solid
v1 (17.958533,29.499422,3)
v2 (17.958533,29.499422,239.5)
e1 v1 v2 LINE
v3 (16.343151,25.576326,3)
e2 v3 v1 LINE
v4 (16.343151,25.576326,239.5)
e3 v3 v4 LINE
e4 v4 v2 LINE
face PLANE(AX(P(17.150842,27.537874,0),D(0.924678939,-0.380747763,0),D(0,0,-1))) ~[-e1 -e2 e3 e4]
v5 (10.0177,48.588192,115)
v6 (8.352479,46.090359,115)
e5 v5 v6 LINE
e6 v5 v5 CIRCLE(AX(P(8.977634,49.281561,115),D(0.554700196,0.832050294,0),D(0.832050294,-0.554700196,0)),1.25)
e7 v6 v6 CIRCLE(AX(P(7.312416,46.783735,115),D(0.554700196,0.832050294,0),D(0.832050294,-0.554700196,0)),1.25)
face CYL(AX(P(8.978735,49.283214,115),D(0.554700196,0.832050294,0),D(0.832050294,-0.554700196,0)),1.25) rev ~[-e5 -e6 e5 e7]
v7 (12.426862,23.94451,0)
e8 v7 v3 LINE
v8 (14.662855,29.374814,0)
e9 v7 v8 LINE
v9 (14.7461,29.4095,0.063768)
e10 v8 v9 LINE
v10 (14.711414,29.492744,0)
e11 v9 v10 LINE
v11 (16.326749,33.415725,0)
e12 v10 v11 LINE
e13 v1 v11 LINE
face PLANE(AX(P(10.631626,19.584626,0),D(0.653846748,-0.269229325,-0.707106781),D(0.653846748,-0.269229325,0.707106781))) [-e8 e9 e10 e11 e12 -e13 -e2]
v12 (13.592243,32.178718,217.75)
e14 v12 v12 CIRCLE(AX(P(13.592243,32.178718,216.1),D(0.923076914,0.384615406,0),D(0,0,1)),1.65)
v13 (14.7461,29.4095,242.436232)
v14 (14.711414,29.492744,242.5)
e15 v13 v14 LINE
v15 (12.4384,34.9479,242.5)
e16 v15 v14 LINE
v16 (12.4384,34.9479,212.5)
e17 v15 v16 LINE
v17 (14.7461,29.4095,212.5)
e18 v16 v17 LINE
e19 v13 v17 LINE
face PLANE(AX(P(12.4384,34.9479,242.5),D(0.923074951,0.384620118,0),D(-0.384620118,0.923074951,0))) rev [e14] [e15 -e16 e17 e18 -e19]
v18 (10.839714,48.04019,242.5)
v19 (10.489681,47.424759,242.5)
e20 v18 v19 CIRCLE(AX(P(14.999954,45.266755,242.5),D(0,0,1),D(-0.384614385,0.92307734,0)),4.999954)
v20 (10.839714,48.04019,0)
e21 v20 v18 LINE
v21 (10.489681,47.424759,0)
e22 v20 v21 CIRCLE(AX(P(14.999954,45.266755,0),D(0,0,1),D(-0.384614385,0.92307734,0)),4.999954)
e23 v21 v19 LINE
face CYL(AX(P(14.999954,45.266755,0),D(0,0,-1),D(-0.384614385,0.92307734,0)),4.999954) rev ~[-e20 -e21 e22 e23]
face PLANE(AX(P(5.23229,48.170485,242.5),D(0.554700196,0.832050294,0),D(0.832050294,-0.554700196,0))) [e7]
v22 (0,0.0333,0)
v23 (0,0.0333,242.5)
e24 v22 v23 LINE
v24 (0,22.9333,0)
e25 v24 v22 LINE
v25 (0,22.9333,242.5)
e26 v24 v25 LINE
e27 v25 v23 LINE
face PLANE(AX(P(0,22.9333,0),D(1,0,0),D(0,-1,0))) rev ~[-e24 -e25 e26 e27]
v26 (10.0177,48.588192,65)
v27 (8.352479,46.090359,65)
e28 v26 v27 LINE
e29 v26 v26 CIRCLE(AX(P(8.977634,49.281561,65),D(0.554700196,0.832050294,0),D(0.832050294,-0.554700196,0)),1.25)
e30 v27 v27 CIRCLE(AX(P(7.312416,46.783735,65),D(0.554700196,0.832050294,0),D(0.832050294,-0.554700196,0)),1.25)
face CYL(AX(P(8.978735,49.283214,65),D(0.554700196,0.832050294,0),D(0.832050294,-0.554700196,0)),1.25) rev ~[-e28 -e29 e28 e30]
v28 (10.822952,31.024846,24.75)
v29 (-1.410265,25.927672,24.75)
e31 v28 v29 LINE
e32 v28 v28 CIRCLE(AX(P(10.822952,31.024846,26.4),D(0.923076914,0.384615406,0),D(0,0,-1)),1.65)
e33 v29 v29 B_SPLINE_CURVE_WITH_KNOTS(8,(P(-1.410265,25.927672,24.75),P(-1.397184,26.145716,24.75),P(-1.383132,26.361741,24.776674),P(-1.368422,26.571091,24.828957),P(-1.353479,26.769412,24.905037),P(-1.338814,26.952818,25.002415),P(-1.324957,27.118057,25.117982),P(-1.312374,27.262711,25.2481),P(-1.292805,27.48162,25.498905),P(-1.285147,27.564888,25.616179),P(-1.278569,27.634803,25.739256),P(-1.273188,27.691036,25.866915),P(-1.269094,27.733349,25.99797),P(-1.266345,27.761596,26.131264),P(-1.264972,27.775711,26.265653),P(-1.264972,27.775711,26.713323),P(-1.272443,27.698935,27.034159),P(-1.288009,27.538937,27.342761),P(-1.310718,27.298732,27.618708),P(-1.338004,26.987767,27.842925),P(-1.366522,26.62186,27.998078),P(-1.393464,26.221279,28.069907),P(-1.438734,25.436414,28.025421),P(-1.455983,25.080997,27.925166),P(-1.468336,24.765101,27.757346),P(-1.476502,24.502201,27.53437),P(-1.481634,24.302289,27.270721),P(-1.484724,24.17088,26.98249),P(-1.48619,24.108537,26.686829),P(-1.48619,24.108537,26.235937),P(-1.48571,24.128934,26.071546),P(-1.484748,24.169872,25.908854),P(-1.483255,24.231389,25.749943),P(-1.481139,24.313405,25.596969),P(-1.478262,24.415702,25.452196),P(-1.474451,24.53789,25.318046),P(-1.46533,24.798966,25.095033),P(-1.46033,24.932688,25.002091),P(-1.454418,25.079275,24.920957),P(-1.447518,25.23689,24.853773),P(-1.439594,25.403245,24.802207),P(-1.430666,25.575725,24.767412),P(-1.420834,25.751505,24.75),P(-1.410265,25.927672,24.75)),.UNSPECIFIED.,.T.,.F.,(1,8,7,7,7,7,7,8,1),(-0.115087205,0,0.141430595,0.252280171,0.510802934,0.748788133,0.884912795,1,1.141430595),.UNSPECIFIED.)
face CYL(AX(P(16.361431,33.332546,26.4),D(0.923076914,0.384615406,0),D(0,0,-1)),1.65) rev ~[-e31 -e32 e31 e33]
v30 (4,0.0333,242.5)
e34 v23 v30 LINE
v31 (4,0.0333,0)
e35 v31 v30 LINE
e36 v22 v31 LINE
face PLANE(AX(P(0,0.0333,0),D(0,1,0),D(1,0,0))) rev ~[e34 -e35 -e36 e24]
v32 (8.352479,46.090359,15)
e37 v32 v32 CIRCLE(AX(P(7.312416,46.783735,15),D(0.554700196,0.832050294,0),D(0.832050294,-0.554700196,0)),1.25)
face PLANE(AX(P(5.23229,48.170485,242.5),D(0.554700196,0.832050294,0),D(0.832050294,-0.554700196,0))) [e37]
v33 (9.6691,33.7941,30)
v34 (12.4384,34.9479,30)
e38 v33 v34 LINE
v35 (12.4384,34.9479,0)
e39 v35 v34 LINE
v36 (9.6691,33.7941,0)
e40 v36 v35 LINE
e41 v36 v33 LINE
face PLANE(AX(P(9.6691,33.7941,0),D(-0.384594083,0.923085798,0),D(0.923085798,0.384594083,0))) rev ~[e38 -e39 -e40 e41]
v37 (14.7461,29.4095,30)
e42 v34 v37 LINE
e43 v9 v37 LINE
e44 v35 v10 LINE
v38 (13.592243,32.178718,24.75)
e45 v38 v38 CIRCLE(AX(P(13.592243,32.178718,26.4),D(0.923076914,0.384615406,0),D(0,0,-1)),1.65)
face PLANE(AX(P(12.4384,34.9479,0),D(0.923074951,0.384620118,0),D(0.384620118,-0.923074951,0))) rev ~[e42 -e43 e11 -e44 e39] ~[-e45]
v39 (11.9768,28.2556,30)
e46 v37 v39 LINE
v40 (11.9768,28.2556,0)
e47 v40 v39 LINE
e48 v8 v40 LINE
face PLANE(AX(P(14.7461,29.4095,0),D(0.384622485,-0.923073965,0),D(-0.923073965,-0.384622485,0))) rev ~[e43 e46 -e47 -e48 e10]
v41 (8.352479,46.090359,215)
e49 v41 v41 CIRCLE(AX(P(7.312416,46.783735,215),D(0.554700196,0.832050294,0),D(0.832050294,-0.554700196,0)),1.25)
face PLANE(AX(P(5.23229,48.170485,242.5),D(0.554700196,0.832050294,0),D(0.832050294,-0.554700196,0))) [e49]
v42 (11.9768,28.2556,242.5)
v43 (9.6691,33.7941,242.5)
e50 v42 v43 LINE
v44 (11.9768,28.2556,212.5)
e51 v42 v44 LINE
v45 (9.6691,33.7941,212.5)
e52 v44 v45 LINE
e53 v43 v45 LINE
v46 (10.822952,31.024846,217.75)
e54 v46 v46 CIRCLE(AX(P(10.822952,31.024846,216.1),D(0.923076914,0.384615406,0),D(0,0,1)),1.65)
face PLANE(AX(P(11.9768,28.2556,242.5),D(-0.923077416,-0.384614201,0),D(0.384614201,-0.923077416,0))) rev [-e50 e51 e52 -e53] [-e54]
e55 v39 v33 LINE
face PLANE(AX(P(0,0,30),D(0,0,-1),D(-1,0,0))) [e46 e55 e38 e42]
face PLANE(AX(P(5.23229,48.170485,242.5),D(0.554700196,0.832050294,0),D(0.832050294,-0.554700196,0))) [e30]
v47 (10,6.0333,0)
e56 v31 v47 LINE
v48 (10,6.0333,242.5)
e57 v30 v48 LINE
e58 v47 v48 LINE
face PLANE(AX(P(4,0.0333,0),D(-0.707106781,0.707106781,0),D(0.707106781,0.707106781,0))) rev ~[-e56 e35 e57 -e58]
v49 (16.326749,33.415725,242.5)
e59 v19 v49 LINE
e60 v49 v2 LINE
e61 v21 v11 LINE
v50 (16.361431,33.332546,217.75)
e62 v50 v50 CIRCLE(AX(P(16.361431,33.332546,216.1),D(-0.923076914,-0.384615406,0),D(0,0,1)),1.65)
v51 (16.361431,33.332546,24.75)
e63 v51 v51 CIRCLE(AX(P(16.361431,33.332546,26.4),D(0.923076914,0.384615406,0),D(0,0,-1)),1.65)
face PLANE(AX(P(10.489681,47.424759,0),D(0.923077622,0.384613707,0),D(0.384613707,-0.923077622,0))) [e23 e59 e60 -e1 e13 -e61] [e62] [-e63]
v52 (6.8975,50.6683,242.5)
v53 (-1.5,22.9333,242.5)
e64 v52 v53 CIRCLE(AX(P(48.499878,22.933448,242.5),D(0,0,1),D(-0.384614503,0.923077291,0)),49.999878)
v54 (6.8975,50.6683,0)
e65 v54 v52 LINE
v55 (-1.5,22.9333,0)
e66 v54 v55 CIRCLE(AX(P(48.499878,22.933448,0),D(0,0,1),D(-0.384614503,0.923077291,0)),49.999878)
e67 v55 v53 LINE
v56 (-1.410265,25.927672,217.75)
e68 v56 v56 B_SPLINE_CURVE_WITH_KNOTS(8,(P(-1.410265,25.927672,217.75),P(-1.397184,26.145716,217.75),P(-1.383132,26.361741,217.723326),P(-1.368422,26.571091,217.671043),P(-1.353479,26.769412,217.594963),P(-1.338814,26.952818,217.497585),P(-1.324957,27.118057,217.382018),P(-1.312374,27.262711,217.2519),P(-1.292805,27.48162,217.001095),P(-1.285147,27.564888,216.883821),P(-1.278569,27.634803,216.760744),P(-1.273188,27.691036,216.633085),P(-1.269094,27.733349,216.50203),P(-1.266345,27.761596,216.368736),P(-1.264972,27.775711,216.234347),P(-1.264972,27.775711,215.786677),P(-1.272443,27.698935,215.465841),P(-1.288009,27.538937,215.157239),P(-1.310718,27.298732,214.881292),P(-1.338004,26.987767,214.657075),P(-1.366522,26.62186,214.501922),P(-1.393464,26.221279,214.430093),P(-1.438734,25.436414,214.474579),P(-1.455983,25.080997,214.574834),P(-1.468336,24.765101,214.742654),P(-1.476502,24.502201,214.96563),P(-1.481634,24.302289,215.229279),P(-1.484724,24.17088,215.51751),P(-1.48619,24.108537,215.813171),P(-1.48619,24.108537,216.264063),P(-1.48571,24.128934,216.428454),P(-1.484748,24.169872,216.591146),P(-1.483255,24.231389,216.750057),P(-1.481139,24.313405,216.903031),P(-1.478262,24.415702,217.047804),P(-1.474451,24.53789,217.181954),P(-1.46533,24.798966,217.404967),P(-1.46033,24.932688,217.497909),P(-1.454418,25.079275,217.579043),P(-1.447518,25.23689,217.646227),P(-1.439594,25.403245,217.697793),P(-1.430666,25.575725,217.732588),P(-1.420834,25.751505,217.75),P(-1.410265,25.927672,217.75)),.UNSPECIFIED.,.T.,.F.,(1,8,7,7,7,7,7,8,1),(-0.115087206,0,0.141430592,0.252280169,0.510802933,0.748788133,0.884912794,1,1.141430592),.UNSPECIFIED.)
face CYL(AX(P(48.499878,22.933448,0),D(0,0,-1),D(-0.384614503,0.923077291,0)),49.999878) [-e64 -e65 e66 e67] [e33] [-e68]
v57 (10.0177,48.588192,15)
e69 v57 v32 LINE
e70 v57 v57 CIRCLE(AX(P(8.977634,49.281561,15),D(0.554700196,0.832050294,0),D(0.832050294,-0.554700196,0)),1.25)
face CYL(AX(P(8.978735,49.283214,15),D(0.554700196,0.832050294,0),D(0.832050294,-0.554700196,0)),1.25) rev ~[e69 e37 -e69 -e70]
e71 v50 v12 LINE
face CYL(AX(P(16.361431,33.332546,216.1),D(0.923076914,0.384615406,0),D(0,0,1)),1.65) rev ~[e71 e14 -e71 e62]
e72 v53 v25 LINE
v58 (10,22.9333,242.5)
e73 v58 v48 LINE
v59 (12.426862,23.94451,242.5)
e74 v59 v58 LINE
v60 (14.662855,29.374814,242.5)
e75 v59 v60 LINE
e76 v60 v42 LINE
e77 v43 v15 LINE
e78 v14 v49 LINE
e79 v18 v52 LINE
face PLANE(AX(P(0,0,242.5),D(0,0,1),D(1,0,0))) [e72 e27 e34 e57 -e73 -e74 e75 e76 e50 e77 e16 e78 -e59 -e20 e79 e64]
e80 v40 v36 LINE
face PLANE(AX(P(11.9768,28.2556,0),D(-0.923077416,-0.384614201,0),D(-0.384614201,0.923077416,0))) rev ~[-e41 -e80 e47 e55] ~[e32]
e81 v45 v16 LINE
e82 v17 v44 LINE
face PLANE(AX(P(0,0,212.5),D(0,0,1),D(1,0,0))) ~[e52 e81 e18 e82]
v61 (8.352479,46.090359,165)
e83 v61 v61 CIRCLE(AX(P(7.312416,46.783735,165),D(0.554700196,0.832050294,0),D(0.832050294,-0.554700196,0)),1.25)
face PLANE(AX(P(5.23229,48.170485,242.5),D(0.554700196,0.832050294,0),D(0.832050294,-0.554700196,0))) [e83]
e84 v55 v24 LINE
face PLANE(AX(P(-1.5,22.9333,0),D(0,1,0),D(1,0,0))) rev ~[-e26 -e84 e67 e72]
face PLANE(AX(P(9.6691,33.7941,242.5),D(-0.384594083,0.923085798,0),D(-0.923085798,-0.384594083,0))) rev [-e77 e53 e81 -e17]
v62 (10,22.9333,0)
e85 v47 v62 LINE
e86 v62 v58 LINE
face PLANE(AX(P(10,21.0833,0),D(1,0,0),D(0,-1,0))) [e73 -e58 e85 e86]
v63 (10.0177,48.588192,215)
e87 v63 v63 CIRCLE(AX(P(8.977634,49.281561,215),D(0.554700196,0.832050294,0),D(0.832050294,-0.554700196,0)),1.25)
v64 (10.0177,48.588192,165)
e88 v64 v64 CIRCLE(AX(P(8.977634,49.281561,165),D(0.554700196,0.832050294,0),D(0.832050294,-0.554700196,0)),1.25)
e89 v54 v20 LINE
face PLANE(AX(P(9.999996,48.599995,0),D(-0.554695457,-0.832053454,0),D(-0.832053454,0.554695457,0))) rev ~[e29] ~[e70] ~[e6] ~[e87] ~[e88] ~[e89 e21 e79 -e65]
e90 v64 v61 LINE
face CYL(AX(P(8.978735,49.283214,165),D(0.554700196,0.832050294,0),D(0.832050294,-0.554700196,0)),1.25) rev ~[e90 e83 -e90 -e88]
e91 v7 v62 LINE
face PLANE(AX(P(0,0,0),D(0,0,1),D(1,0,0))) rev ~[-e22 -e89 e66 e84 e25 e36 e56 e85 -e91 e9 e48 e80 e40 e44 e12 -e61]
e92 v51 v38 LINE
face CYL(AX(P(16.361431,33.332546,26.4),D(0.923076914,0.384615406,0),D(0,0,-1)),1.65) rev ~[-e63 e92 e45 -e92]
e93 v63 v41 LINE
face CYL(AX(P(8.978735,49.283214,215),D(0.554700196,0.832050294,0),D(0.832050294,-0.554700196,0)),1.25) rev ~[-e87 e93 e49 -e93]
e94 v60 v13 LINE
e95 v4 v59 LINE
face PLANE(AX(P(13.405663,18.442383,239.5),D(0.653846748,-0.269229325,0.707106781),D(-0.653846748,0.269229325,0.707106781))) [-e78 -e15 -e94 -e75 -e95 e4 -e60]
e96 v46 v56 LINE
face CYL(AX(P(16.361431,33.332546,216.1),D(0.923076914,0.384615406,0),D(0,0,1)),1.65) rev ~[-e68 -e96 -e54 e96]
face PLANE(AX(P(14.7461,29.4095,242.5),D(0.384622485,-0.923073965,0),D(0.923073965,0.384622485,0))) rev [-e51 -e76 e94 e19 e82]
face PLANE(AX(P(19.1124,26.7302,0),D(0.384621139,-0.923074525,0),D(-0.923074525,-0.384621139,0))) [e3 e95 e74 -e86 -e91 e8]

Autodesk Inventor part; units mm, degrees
ref_plane "YZ Plane" through (0, 0, 0) normal (1, 0, 0) x (0, 1, 0)
ref_plane "Work Plane1" through (0, 0, 0) normal (0, 0, 1) x (1, 0, 0)
sketch "Sketch1" plane through (0, 0, 0) normal (0, 0, 1) x (1, 0, 0)
  line L0 (10, 0) -> (-1.5, 0) projected
  line L1 (10, 45.2667) -> (10, 0) projected
  arc A0 (13.0769, 49.8821) -> (10, 45.2667) centre (15, 45.2667) ccw projected
  line L2 (54.8615, 67.2923) -> (13.0769, 49.8821) projected
  line L3 (50.4385, 77.9077) -> (54.8615, 67.2923) projected
  line L4 (50.4385, 77.9077) -> (29.2692, 69.0872) projected
  arc A1 (29.2692, 69.0872) -> (-1.5, 22.9333) centre (48.5, 22.9333) ccw projected
  line L5 (-1.5, 0) -> (-1.5, 22.9333) projected
  line L6 (15, 45.2667) -> (6.8975, 50.6683)
  line L7 (10, 48.6) -> (19.7692, 25.1538) projected
  line L8 (35.4, 31.6667) -> (10, 21.0833) projected
  line L9 (19.1124, 26.7302) -> (10, 22.9333)
  line L10 (-1.5, 22.9333) -> (10, 22.9333)
  line L11 (-1.5, 22.9333) -> (0, 22.9333)
  line L12 (0, 22.9333) -> (0, -23.4445)
  line L13 (0, -23.4445) -> (-1.5, -23.4445)
  line L14 (-1.5, -23.4445) -> (-1.5, 22.9333)
  line L15 (0, 0.0333) -> (4, 0.0333)
  line L16 (4, 0.0333) -> (10, 6.0333)
  point P0 (0, 0)
  point P1 (10.4897, 47.4247)
  point P2 (10.8397, 48.0402)
  point P3 (10, 48.6)
  point P4 (0, 22.9333)
  dimension "d3" = 1.5
  dimension "d4" = 4
  dimension "d5" = 45
  dimension "d6" = 22.9
extrude "Extrusion1" add sketch "Sketch1" along normal blind 242.5 contours L16 L15 L12 L10 L1 | A1 L6 L7 A0 L1 L10 | L1 A0 L7 L9 | L6 A0 L7
sketch "Sketch2" plane through (6.8975, 50.6683, 242.5) normal (0.5547002, 0.8320503, 0) x (0.8320503, -0.5547002, 0)
  line L0 (4.738, 242.5) -> (0, 242.5) projected
  line L1 (0, 242.5) -> (0, 0) projected
  line L2 (4.738, 0) -> (0, 0) projected
  line L3 (4.738, 242.5) -> (4.738, 0) projected
  circle A0 centre (2.5, 227.5) radius 1.25
  circle A1 centre (2.5, 177.5) radius 1.25
  circle A2 centre (2.5, 127.5) radius 1.25
  circle A3 centre (2.5, 77.5) radius 1.25
  circle A4 centre (2.5, 27.5) radius 1.25
  point P0 (22.3667, 242.5)
  dimension "d7" = 2.5
  dimension "d8" = 2.5
  dimension "d9" = 15
  dimension "d12" = 50
extrude "Extrusion2" cut sketch "Sketch2" against normal blind 3 contours A0 | A1 | A2 | A3 | A4
sketch "Sketch3" plane through (0, 0, 0) normal (0, 0, -1) x (-1, 0, 0)
  line L0 (-10, 6.0333) -> (-10, 22.9333) projected
  line L1 (-4, 0.0333) -> (-10, 6.0333) projected
  line L2 (0, 0.0333) -> (-4, 0.0333) projected
  line L3 (0, 22.9333) -> (0, 0.0333) projected
  line L4 (1.5, 22.9333) -> (0, 22.9333) projected
  arc A0 (1.5, 22.9333) -> (-6.8975, 50.6683) centre (-48.5, 22.9333) ccw projected
  line L5 (-10.8397, 48.0402) -> (-6.8975, 50.6683) projected
  arc A1 (-10.4897, 47.4247) -> (-10.8397, 48.0402) centre (-15, 45.2667) ccw projected
  line L6 (-19.1124, 26.7302) -> (-10.4897, 47.4247) projected
  line L7 (-10, 22.9333) -> (-19.1124, 26.7302) projected
  line L8 (-12.4384, 34.9479) -> (-14.7461, 29.4095)
  line L9 (-14.7461, 29.4095) -> (-11.9768, 28.2556)
  line L10 (-11.9768, 28.2556) -> (-9.6691, 33.7941)
  line L11 (-9.6691, 33.7941) -> (-12.4384, 34.9479)
  point P0 (0, 0)
  dimension "d19" = 12.7
  dimension "d20" = 6
  dimension "d21" = 3
  dimension "d22" = 3
extrude "Extrusion3" cut sketch "Sketch3" against normal blind 30 contours L11 L10 L9 L8
sketch "Sketch4" plane through (10.4897, 47.4247, 242.5) normal (0.9230769, 0.3846154, 0) x (0, 0, -1)
  line L0 (242.5, -22.4191) -> (242.5, 0) projected
  line L1 (242.5, 0) -> (0, 0) projected
  line L2 (0, -22.4191) -> (0, 0) projected
  line L3 (242.5, -22.4191) -> (0, -22.4191) projected
  line L4 (242.5, -18.2665) -> (242.5, -12.2665) construction
  line L5 (242.5, -18.2665) -> (212.5, -18.2665) projected
  line L6 (212.5, -18.2665) -> (212.5, -12.2665) projected
  line L7 (242.5, -12.2665) -> (212.5, -12.2665) projected
  circle A0 centre (216.1, -15.2665) radius 1.65
  line L8 (217.7743, -18.1665) -> (214.4257, -18.1665)
  line L9 (214.4257, -18.1665) -> (212.7514, -15.2665)
  line L10 (212.7514, -15.2665) -> (214.4257, -12.3665)
  line L11 (214.4257, -12.3665) -> (217.7743, -12.3665)
  line L12 (217.7743, -12.3665) -> (219.4486, -15.2665)
  line L13 (219.4486, -15.2665) -> (217.7743, -18.1665)
  point P0 (242.5, -39.7422)
  point P1 (212.5, -15.2665)
  dimension "d25" = 3.3
  dimension "d26" = 3.6
  dimension "d27" = 5.8
extrude "Extrusion4" cut sketch "Sketch4" against normal through all contours A0
ref_plane "Work Plane2" through (0, 0, 121.25) normal (0, 0, 1) x (1, 0, 0)
mirror "Mirror1" about plane through (0, 0, 121.25) normal (0, 0, 1) of "Extrusion4", "Extrusion3"
chamfer "Chamfer1" distance 3 angle 45 1 edges at (19.1124, 26.7302, 121.25)
chamfer "Chamfer2" distance 3 angle 45 2 edges at (17.1509, 27.5379, 0) (17.1509, 27.5379, 242.5)
properties part number "ESQUINA_REDONDEADA_R50_P2"
